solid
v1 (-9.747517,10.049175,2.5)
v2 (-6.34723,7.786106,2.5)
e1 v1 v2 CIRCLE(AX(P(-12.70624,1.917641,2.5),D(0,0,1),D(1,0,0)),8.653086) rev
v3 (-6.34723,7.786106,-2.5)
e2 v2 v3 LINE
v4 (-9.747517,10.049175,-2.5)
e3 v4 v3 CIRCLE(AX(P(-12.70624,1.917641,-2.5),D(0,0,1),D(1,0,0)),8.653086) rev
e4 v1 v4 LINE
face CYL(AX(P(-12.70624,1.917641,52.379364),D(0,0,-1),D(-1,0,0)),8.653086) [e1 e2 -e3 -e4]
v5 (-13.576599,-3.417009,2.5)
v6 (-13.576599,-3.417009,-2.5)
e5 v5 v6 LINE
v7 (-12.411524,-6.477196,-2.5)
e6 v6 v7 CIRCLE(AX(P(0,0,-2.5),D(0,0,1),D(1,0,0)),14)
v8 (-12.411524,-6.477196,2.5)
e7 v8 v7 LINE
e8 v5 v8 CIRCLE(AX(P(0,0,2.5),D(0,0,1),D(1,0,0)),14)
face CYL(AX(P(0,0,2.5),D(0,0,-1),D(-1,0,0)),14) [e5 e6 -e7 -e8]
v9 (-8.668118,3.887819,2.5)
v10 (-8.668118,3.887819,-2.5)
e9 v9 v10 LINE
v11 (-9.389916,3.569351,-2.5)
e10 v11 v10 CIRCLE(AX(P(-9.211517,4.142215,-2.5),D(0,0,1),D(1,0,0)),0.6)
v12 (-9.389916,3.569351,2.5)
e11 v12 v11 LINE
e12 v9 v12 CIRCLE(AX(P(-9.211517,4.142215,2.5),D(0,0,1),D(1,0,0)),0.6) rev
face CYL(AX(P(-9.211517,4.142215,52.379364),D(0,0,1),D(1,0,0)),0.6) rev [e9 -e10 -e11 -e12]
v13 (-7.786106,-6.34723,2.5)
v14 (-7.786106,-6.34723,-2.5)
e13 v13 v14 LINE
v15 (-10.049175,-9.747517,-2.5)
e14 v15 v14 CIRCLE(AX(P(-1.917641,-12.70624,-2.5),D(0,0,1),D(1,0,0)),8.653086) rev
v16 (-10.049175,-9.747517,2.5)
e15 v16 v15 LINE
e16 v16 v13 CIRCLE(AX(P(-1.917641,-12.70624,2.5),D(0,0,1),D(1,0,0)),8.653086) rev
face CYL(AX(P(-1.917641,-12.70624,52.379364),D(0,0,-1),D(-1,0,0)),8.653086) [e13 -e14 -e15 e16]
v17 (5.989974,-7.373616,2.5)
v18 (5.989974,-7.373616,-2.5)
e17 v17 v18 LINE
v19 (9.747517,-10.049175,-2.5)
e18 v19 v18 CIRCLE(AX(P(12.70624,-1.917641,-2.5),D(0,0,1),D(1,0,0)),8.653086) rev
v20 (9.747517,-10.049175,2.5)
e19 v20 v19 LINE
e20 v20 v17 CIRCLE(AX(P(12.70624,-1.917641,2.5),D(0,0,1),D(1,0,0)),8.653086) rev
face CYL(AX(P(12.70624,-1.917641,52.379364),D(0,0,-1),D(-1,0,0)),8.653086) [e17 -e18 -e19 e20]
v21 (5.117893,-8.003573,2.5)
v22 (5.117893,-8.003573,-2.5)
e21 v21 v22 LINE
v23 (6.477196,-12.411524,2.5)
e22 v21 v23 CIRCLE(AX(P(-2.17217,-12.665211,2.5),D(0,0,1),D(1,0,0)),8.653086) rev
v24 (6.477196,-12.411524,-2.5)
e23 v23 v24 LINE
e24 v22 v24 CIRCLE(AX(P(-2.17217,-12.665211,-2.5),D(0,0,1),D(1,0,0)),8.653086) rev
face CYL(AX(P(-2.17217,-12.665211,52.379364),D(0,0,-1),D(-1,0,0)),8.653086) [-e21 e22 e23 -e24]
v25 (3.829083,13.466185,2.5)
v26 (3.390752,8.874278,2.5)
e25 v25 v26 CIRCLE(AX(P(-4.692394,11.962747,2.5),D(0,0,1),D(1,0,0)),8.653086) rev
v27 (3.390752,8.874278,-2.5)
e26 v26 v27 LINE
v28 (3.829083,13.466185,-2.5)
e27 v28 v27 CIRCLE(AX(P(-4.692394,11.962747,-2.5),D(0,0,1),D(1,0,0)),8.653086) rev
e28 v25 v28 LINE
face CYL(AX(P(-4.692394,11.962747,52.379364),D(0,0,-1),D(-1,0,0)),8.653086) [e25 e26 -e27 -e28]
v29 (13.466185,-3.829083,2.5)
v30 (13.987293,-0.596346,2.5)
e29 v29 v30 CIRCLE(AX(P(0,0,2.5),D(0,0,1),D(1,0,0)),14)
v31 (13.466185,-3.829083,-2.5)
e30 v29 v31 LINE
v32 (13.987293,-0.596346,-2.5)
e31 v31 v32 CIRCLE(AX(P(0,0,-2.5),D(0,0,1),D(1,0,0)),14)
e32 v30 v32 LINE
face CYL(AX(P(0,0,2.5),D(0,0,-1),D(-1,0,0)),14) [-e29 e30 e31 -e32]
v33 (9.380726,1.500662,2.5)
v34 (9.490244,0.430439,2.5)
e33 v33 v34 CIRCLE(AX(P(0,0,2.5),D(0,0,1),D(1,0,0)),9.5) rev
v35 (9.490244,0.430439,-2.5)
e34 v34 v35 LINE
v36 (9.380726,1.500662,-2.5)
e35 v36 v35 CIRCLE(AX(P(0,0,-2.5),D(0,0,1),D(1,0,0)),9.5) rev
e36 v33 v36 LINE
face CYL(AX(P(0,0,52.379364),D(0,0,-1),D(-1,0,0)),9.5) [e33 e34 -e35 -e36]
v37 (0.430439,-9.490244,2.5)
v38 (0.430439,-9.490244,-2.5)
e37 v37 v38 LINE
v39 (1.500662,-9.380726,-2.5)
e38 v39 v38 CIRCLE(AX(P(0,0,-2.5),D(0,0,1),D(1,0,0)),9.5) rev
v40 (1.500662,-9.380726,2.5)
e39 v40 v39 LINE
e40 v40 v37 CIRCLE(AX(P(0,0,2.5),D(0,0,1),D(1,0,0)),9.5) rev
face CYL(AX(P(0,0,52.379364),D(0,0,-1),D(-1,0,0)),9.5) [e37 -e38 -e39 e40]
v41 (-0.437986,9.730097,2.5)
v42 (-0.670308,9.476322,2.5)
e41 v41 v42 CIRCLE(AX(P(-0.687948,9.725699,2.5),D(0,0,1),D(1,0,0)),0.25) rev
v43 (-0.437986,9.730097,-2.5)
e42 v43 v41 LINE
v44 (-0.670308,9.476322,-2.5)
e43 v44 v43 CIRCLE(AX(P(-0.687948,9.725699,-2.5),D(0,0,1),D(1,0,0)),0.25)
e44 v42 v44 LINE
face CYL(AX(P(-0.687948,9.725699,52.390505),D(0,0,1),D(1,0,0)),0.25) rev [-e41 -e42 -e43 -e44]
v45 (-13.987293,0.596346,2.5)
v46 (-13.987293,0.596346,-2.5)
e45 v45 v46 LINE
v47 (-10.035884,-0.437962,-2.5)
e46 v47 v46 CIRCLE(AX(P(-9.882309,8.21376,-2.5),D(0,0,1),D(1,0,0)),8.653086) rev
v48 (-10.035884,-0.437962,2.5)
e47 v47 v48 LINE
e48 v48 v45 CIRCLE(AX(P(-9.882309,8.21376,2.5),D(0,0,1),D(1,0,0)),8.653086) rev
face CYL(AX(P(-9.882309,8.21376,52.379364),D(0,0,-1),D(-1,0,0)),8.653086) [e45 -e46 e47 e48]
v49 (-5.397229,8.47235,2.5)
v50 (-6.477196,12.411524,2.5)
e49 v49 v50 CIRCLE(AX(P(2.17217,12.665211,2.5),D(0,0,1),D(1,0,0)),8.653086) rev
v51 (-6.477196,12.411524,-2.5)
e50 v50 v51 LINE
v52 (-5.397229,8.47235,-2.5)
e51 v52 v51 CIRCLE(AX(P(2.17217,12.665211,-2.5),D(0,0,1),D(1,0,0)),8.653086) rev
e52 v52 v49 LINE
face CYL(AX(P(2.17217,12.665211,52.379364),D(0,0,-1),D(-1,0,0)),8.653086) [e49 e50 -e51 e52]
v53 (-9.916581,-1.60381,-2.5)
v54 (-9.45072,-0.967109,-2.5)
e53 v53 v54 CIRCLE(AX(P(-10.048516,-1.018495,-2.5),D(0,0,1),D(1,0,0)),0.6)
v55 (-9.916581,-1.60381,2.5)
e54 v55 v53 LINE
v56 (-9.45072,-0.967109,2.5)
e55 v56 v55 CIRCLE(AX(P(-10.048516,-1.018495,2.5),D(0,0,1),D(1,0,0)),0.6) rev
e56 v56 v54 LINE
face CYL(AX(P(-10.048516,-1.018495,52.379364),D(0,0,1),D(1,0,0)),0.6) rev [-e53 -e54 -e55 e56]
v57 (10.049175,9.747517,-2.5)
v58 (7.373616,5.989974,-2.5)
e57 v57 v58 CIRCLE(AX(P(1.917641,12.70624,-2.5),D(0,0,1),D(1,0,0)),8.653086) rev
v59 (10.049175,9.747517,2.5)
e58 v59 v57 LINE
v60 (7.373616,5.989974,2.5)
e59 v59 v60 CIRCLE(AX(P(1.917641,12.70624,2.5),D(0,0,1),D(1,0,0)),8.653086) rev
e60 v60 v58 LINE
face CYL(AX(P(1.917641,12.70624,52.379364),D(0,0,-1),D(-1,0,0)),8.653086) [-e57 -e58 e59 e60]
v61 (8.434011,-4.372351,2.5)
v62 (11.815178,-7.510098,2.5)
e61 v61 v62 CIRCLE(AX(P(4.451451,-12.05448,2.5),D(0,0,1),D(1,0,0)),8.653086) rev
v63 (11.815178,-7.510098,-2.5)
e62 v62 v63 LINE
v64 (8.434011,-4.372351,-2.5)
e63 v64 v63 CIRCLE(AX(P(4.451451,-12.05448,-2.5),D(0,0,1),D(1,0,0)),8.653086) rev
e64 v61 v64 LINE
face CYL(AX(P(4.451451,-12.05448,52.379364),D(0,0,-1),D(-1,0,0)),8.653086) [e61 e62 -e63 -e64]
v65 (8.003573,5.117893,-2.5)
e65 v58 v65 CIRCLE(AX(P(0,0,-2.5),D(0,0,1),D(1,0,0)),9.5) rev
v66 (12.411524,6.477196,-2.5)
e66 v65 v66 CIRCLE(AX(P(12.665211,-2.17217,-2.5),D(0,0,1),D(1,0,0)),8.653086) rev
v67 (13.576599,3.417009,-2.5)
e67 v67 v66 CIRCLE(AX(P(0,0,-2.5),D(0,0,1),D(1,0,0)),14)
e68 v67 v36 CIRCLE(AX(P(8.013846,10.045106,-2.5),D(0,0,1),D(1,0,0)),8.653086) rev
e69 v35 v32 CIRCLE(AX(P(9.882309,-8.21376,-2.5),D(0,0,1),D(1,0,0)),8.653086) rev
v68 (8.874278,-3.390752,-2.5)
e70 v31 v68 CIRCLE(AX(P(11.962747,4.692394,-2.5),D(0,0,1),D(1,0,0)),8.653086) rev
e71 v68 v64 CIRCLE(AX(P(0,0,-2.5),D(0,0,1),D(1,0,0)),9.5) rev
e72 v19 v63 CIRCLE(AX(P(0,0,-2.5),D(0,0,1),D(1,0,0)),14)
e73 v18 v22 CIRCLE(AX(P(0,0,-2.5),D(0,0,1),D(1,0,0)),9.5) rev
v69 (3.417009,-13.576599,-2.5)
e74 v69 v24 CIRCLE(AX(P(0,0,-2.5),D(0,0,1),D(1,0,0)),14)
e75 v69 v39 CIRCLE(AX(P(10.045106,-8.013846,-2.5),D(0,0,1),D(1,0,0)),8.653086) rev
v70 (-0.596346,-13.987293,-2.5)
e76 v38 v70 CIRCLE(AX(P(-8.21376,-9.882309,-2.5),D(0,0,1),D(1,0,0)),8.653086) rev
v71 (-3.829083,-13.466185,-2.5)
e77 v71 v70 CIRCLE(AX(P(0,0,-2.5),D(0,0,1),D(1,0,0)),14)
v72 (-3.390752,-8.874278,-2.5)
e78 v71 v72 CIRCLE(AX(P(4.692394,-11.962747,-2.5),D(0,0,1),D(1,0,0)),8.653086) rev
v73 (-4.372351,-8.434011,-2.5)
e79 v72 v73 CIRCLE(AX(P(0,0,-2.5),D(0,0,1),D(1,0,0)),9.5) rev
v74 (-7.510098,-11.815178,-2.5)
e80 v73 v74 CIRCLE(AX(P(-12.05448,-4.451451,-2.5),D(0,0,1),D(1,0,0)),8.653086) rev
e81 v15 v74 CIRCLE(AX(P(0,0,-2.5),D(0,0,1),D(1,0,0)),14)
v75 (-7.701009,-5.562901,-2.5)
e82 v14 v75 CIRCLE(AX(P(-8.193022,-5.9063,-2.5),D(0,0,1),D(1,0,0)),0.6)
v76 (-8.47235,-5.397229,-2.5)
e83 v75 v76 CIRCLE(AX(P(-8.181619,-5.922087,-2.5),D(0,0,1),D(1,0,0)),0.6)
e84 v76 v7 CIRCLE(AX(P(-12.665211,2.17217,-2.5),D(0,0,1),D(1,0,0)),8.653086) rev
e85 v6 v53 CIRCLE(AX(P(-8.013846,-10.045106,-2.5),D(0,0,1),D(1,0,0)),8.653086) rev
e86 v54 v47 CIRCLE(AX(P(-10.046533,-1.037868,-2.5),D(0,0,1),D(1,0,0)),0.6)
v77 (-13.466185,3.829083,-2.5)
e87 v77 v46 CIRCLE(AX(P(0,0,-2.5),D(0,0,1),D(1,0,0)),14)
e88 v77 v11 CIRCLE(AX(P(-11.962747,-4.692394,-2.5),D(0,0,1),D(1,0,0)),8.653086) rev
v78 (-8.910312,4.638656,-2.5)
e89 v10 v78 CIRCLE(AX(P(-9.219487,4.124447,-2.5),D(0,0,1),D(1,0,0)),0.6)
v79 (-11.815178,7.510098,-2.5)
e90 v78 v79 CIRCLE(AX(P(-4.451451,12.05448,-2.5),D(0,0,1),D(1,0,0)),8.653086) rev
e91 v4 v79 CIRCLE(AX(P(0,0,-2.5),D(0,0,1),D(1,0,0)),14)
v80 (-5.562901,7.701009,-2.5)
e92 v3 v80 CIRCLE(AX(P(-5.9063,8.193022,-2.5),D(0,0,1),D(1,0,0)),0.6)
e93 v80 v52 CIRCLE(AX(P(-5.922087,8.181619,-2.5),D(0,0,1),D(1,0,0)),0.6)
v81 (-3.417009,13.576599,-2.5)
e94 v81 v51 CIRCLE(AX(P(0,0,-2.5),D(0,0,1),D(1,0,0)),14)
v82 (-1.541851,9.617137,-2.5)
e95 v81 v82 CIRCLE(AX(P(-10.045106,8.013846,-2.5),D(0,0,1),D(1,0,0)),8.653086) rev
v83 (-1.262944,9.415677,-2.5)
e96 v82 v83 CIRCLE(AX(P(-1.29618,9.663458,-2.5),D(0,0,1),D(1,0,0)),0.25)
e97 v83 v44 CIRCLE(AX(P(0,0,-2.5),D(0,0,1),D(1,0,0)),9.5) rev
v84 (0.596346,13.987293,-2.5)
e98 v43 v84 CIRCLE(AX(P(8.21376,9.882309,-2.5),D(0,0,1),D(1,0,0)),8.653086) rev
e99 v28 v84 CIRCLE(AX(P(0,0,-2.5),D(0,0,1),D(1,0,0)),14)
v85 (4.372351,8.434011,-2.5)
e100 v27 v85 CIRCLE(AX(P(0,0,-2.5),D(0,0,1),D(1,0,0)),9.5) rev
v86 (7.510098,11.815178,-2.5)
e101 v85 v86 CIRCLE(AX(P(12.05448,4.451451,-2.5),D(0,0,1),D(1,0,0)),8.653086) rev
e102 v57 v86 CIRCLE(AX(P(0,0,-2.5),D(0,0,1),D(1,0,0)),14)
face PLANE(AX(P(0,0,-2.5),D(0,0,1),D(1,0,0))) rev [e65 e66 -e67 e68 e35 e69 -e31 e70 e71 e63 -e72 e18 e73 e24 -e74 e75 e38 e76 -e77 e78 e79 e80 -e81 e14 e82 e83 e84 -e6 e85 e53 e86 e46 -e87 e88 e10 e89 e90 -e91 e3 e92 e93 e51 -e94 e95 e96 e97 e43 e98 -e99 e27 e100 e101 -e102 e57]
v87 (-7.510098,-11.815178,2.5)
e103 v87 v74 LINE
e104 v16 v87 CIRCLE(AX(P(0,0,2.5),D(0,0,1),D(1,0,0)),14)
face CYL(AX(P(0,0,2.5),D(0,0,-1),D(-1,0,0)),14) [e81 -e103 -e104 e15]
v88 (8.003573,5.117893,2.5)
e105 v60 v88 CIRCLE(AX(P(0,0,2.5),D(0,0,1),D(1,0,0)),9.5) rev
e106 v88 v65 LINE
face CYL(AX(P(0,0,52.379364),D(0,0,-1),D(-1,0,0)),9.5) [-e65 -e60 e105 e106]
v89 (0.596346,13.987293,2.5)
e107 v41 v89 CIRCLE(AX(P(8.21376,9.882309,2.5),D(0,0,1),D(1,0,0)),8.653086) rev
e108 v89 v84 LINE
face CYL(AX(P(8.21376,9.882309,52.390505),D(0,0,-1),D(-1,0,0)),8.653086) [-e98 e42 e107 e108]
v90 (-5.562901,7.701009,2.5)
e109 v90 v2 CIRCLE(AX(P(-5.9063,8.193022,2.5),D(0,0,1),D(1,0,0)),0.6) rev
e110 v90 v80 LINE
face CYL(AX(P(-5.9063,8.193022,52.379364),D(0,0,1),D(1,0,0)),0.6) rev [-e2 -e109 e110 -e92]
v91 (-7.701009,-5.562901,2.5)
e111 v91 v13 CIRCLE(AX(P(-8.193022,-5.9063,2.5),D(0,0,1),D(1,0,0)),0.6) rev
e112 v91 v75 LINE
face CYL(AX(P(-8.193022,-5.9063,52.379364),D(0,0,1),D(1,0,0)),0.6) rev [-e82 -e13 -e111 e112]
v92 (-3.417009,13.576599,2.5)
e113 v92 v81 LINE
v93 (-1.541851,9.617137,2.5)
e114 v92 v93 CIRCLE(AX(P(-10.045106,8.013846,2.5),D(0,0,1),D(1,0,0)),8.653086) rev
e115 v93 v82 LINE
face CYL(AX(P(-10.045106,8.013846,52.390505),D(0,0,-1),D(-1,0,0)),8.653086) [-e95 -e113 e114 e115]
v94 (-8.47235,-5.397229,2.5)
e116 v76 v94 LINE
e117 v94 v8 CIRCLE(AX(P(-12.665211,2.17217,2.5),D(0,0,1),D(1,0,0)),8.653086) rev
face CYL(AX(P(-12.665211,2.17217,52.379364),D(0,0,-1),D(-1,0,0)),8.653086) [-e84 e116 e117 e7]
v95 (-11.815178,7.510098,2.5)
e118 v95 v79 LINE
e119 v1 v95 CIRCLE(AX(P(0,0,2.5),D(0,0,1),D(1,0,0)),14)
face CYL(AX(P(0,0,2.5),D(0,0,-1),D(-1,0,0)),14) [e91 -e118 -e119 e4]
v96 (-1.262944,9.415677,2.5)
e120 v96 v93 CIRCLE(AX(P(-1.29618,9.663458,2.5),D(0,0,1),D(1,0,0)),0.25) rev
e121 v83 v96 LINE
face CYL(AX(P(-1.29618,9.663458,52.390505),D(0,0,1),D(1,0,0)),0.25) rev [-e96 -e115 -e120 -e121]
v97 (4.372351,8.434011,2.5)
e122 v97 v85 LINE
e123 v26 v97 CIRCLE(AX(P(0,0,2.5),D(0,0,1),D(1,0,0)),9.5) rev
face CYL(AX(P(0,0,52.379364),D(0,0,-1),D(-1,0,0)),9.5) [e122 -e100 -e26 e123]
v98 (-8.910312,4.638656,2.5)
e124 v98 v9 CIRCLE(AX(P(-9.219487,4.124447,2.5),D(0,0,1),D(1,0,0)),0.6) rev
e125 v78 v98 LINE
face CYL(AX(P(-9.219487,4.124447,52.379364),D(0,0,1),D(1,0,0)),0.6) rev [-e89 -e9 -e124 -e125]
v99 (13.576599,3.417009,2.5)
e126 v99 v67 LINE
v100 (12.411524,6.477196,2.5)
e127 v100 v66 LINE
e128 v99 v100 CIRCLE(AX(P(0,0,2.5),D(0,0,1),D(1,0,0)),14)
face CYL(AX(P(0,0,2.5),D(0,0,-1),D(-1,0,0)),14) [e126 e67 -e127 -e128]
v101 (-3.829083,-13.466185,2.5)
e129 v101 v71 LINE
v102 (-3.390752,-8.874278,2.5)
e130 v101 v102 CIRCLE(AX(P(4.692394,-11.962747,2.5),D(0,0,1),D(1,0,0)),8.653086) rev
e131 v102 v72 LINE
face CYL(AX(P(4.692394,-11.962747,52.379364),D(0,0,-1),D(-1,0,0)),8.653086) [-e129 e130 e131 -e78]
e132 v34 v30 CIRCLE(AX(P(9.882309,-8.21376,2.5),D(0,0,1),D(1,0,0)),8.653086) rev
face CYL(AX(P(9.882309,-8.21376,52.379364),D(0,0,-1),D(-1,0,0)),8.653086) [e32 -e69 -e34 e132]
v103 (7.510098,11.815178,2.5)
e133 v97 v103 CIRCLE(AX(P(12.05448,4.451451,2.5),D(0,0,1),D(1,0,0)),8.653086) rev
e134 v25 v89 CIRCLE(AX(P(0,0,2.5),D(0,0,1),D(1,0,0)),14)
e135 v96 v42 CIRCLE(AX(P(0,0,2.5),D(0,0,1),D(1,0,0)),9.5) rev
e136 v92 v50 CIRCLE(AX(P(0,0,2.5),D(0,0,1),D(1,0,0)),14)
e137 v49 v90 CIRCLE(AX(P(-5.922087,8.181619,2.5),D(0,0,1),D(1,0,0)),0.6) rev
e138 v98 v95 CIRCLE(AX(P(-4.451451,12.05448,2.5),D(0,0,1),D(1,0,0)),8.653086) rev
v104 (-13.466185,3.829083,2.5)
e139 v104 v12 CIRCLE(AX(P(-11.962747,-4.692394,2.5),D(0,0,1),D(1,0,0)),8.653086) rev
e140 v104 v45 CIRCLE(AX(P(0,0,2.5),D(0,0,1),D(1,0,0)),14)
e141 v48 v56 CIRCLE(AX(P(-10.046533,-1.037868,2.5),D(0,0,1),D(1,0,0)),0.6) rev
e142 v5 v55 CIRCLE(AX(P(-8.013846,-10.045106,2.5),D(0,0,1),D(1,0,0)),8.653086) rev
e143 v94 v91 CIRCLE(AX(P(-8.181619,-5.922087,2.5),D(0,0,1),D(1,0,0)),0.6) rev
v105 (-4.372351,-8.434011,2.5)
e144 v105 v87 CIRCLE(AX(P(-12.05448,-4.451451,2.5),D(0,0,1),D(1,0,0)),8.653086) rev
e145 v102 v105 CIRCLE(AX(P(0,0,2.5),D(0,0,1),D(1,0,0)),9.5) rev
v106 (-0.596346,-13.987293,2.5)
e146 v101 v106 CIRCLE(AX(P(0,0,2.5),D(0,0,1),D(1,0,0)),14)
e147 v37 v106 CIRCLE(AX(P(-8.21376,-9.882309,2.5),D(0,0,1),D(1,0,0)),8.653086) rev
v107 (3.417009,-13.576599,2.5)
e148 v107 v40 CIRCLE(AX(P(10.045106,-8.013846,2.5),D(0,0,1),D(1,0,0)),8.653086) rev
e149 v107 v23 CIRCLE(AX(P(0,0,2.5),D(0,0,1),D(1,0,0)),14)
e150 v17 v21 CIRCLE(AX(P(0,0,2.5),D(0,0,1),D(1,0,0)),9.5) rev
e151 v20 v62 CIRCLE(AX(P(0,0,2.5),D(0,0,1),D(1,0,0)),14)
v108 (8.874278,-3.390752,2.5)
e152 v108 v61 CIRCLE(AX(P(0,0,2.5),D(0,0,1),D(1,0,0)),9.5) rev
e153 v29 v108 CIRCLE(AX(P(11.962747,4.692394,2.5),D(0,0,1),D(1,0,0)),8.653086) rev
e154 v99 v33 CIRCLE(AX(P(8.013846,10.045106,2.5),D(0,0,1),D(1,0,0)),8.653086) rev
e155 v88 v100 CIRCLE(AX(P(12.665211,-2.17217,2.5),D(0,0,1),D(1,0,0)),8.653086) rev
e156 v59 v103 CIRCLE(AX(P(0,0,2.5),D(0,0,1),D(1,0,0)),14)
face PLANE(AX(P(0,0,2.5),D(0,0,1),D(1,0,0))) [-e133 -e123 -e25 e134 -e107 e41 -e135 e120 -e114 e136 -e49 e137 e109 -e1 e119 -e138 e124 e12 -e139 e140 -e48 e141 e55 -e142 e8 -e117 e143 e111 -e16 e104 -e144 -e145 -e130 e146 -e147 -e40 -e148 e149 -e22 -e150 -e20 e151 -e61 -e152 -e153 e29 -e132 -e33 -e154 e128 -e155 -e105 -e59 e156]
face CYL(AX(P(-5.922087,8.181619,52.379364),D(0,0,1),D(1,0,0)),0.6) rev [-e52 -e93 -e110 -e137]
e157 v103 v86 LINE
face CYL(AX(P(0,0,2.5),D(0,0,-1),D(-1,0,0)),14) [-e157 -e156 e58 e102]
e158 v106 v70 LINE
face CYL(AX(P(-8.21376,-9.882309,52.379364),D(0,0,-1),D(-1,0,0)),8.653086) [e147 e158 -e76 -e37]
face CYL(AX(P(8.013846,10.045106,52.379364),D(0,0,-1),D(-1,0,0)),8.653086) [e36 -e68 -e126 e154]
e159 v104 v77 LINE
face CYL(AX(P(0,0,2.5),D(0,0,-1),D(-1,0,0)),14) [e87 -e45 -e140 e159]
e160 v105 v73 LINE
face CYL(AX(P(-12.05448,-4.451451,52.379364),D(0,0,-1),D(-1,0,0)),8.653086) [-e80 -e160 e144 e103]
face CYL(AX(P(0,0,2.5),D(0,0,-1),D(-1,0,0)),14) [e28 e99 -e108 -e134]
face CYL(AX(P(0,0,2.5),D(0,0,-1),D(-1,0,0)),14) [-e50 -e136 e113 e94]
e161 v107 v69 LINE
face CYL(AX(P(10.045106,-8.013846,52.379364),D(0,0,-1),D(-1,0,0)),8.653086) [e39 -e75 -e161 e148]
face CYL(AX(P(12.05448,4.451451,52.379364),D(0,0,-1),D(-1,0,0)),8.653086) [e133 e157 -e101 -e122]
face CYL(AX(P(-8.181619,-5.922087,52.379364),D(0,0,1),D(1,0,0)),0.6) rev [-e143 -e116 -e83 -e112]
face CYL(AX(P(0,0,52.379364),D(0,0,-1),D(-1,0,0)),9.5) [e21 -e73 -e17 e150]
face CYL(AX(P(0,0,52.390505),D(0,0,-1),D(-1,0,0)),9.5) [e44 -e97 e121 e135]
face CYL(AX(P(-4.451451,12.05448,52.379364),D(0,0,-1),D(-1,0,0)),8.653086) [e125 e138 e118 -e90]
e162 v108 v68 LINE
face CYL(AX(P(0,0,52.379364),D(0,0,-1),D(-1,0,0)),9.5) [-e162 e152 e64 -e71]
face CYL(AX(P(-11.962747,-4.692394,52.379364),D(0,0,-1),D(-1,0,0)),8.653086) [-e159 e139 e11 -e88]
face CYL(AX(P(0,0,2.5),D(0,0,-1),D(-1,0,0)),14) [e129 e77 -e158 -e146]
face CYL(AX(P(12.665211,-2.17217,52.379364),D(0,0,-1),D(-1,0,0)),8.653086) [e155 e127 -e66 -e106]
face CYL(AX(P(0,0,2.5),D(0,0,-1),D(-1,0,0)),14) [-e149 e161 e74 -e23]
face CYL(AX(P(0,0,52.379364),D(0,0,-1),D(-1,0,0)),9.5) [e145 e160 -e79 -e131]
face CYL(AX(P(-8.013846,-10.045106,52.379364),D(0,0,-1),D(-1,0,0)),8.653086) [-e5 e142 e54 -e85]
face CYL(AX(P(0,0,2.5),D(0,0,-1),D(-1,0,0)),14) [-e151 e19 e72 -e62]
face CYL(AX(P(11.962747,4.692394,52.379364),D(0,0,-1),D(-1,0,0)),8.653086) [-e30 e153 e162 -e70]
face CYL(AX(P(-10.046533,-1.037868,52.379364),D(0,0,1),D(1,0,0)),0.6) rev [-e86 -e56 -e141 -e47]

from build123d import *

# Parameters (mm, degrees)
SKETCH1_R           = 14
BOSS_EXTRUDE1_DEPTH = 2.5
CUT_EXTRUDE1_START  = 21.420577857
CUT_EXTRUDE1_DEPTH  = 26.420577857
FILLET1_R           = 0.25
CIRPATTERN1_COUNT   = 12
FILLET2_R           = 0.6
FILLET3_R           = 0.6
FILLET4_R           = 0.6
FILLET5_R           = 0.6


with BuildPart() as part:
    # Sketch1 → Boss-Extrude1 (new, symmetric)
    with BuildSketch(Plane.XY):
        Circle(SKETCH1_R)
    extrude(amount=BOSS_EXTRUDE1_DEPTH, both=True)

    # Sketch2 → Cut-Extrude1 (cut)
    with BuildSketch(Plane.XY.offset(2.5).offset(CUT_EXTRUDE1_START)):
        with BuildLine():
            ThreePointArc((-0.430438648, 9.490243546), (-0.222226767, 11.808448469), (0.596346311, 13.987293201))
            ThreePointArc((0.596346311, 13.987293201), (-1.425202617, 13.927268128), (-3.417009435, 13.576599225))
            ThreePointArc((-3.417009435, 13.576599225), (-2.174093588, 11.608710395), (-1.50066187, 9.380725662))
            ThreePointArc((-1.50066187, 9.380725662), (-0.967101776, 9.450646229), (-0.430438648, 9.490243546))
        make_face()
    cut_extrude1 = extrude(amount=-CUT_EXTRUDE1_DEPTH, mode=Mode.SUBTRACT)

    # Fillet1
    fillet1_edges = [part.edges().sort_by_distance(p)[0] for p in [
        (-1.50066187, 9.380725662, 0),
        (-0.430438648, 9.490243546, 0),
    ]]
    fillet(fillet1_edges, radius=FILLET1_R)

    # CirPattern1: Cut-Extrude1 ×12 about axis
    cirpattern1_axis = Axis((0, 0, 2.5), (0, 0, 1))
    for i in range(1, CIRPATTERN1_COUNT):
        add(cut_extrude1.rotate(cirpattern1_axis, i * 360 / CIRPATTERN1_COUNT), mode=Mode.SUBTRACT)

    # Fillet2
    # the kernel refuses this fillet: 0.6 mm, written as the material it adds along each edge
    with BuildSketch(Plane(origin=(-5.989974133, 7.373615794, 2.5), x_dir=(-0.6546840177965881, 0.7559026636027397, 0), z_dir=(0, 0, -1))) as fillet2_piece_1:
        with BuildLine():
            CenterArc((0.564611753, 0.599701652), FILLET2_R, 185.108089024, 83.084978973)
            ThreePointArc((-0.03300535, 0.546280701), (-0.012568085, 0.273378072), (0, 0))
            ThreePointArc((0, 0), (0.272846371, 0.004302723), (0.545692742, 0))
        make_face()
    extrude(amount=5)
    with BuildSketch(Plane(origin=(-5.117892577, 8.003572675, 2.5), x_dir=(-0.8266142951027914, -0.5627688754113143, 0), z_dir=(0, 0, -1))) as fillet2_piece_2:
        with BuildLine():
            CenterArc((0.564559284, 0.599751046), FILLET2_R, 185.264442517, 83.084978973)
            ThreePointArc((-0.032909815, 0.54469947), (-0.012160017, 0.272609225), (0, 0))
            ThreePointArc((0, 0), (0.273638428, 0.003941765), (0.547276857, 0))
        make_face()
    extrude(amount=5)

    # Fillet3
    # the kernel refuses this fillet: 0.6 mm, written as the material it adds along each edge
    with BuildSketch(Plane(origin=(-8.874277665, 3.390751529, 2.5), x_dir=(-0.9449243226648774, 0.3272889005700054, 0), z_dir=(0, 0, -1))) as fillet3_piece_1:
        with BuildLine():
            CenterArc((0.564611753, 0.599701652), FILLET3_R, 185.108089024, 83.084978973)
            ThreePointArc((-0.03300535, 0.546280701), (-0.012568085, 0.273378072), (0, 0))
            ThreePointArc((0, 0), (0.272846371, 0.004302723), (0.545692742, 0))
        make_face()
    extrude(amount=5)
    with BuildSketch(Plane(origin=(-8.434011323, 4.372350969, 2.5), x_dir=(-0.4344845409847307, -0.9006792901167916, 0), z_dir=(0, 0, -1))) as fillet3_piece_2:
        with BuildLine():
            CenterArc((0.564559284, 0.599751046), FILLET3_R, 185.264442517, 83.084978973)
            ThreePointArc((-0.032909815, 0.54469947), (-0.012160017, 0.272609225), (0, 0))
            ThreePointArc((0, 0), (0.273638428, 0.003941765), (0.547276857, 0))
        make_face()
    extrude(amount=5)

    # Fillet4
    # the kernel refuses this fillet: 0.6 mm, written as the material it adds along each edge
    with BuildSketch(Plane(origin=(-9.380725662, -1.50066187, 2.5), x_dir=(-0.9819729183665902, -0.18902165906213533, 0), z_dir=(0, 0, -1))) as fillet4_piece_1:
        with BuildLine():
            CenterArc((0.564611753, 0.599701652), FILLET4_R, 185.108089024, 83.084978973)
            ThreePointArc((-0.03300535, 0.546280701), (-0.012568085, 0.273378072), (0, 0))
            ThreePointArc((0, 0), (0.272846371, 0.004302723), (0.545692742, 0))
        make_face()
    extrude(amount=5)
    with BuildSketch(Plane(origin=(-9.490243546, -0.430438648, 2.5), x_dir=(0.07406499501400296, -0.997253416396041, 0), z_dir=(0, 0, -1))) as fillet4_piece_2:
        with BuildLine():
            CenterArc((0.564559284, 0.599751046), FILLET4_R, 185.264442517, 83.084978973)
            ThreePointArc((-0.032909815, 0.54469947), (-0.012160017, 0.272609225), (0, 0))
            ThreePointArc((0, 0), (0.273638428, 0.003941765), (0.547276857, 0))
        make_face()
    extrude(amount=5)

    # Fillet5
    # the kernel refuses this fillet: 0.6 mm, written as the material it adds along each edge
    with BuildSketch(Plane(origin=(-7.373615794, -5.989974133, 2.5), x_dir=(-0.7559026636027405, -0.6546840177965871, 0), z_dir=(0, 0, -1))) as fillet5_piece_1:
        with BuildLine():
            CenterArc((0.564611753, 0.599701652), FILLET5_R, 185.108089024, 83.084978973)
            ThreePointArc((-0.03300535, 0.546280701), (-0.012568085, 0.273378072), (0, 0))
            ThreePointArc((0, 0), (0.272846371, 0.004302723), (0.545692742, 0))
        make_face()
    extrude(amount=5)
    with BuildSketch(Plane(origin=(-8.003572675, -5.117892577, 2.5), x_dir=(0.562768875411312, -0.8266142951027928, 0), z_dir=(0, 0, -1))) as fillet5_piece_2:
        with BuildLine():
            CenterArc((0.564559284, 0.599751046), FILLET5_R, 185.264442517, 83.084978973)
            ThreePointArc((-0.032909815, 0.54469947), (-0.012160017, 0.272609225), (0, 0))
            ThreePointArc((0, 0), (0.273638428, 0.003941765), (0.547276857, 0))
        make_face()
    extrude(amount=5)


solid = part.part
